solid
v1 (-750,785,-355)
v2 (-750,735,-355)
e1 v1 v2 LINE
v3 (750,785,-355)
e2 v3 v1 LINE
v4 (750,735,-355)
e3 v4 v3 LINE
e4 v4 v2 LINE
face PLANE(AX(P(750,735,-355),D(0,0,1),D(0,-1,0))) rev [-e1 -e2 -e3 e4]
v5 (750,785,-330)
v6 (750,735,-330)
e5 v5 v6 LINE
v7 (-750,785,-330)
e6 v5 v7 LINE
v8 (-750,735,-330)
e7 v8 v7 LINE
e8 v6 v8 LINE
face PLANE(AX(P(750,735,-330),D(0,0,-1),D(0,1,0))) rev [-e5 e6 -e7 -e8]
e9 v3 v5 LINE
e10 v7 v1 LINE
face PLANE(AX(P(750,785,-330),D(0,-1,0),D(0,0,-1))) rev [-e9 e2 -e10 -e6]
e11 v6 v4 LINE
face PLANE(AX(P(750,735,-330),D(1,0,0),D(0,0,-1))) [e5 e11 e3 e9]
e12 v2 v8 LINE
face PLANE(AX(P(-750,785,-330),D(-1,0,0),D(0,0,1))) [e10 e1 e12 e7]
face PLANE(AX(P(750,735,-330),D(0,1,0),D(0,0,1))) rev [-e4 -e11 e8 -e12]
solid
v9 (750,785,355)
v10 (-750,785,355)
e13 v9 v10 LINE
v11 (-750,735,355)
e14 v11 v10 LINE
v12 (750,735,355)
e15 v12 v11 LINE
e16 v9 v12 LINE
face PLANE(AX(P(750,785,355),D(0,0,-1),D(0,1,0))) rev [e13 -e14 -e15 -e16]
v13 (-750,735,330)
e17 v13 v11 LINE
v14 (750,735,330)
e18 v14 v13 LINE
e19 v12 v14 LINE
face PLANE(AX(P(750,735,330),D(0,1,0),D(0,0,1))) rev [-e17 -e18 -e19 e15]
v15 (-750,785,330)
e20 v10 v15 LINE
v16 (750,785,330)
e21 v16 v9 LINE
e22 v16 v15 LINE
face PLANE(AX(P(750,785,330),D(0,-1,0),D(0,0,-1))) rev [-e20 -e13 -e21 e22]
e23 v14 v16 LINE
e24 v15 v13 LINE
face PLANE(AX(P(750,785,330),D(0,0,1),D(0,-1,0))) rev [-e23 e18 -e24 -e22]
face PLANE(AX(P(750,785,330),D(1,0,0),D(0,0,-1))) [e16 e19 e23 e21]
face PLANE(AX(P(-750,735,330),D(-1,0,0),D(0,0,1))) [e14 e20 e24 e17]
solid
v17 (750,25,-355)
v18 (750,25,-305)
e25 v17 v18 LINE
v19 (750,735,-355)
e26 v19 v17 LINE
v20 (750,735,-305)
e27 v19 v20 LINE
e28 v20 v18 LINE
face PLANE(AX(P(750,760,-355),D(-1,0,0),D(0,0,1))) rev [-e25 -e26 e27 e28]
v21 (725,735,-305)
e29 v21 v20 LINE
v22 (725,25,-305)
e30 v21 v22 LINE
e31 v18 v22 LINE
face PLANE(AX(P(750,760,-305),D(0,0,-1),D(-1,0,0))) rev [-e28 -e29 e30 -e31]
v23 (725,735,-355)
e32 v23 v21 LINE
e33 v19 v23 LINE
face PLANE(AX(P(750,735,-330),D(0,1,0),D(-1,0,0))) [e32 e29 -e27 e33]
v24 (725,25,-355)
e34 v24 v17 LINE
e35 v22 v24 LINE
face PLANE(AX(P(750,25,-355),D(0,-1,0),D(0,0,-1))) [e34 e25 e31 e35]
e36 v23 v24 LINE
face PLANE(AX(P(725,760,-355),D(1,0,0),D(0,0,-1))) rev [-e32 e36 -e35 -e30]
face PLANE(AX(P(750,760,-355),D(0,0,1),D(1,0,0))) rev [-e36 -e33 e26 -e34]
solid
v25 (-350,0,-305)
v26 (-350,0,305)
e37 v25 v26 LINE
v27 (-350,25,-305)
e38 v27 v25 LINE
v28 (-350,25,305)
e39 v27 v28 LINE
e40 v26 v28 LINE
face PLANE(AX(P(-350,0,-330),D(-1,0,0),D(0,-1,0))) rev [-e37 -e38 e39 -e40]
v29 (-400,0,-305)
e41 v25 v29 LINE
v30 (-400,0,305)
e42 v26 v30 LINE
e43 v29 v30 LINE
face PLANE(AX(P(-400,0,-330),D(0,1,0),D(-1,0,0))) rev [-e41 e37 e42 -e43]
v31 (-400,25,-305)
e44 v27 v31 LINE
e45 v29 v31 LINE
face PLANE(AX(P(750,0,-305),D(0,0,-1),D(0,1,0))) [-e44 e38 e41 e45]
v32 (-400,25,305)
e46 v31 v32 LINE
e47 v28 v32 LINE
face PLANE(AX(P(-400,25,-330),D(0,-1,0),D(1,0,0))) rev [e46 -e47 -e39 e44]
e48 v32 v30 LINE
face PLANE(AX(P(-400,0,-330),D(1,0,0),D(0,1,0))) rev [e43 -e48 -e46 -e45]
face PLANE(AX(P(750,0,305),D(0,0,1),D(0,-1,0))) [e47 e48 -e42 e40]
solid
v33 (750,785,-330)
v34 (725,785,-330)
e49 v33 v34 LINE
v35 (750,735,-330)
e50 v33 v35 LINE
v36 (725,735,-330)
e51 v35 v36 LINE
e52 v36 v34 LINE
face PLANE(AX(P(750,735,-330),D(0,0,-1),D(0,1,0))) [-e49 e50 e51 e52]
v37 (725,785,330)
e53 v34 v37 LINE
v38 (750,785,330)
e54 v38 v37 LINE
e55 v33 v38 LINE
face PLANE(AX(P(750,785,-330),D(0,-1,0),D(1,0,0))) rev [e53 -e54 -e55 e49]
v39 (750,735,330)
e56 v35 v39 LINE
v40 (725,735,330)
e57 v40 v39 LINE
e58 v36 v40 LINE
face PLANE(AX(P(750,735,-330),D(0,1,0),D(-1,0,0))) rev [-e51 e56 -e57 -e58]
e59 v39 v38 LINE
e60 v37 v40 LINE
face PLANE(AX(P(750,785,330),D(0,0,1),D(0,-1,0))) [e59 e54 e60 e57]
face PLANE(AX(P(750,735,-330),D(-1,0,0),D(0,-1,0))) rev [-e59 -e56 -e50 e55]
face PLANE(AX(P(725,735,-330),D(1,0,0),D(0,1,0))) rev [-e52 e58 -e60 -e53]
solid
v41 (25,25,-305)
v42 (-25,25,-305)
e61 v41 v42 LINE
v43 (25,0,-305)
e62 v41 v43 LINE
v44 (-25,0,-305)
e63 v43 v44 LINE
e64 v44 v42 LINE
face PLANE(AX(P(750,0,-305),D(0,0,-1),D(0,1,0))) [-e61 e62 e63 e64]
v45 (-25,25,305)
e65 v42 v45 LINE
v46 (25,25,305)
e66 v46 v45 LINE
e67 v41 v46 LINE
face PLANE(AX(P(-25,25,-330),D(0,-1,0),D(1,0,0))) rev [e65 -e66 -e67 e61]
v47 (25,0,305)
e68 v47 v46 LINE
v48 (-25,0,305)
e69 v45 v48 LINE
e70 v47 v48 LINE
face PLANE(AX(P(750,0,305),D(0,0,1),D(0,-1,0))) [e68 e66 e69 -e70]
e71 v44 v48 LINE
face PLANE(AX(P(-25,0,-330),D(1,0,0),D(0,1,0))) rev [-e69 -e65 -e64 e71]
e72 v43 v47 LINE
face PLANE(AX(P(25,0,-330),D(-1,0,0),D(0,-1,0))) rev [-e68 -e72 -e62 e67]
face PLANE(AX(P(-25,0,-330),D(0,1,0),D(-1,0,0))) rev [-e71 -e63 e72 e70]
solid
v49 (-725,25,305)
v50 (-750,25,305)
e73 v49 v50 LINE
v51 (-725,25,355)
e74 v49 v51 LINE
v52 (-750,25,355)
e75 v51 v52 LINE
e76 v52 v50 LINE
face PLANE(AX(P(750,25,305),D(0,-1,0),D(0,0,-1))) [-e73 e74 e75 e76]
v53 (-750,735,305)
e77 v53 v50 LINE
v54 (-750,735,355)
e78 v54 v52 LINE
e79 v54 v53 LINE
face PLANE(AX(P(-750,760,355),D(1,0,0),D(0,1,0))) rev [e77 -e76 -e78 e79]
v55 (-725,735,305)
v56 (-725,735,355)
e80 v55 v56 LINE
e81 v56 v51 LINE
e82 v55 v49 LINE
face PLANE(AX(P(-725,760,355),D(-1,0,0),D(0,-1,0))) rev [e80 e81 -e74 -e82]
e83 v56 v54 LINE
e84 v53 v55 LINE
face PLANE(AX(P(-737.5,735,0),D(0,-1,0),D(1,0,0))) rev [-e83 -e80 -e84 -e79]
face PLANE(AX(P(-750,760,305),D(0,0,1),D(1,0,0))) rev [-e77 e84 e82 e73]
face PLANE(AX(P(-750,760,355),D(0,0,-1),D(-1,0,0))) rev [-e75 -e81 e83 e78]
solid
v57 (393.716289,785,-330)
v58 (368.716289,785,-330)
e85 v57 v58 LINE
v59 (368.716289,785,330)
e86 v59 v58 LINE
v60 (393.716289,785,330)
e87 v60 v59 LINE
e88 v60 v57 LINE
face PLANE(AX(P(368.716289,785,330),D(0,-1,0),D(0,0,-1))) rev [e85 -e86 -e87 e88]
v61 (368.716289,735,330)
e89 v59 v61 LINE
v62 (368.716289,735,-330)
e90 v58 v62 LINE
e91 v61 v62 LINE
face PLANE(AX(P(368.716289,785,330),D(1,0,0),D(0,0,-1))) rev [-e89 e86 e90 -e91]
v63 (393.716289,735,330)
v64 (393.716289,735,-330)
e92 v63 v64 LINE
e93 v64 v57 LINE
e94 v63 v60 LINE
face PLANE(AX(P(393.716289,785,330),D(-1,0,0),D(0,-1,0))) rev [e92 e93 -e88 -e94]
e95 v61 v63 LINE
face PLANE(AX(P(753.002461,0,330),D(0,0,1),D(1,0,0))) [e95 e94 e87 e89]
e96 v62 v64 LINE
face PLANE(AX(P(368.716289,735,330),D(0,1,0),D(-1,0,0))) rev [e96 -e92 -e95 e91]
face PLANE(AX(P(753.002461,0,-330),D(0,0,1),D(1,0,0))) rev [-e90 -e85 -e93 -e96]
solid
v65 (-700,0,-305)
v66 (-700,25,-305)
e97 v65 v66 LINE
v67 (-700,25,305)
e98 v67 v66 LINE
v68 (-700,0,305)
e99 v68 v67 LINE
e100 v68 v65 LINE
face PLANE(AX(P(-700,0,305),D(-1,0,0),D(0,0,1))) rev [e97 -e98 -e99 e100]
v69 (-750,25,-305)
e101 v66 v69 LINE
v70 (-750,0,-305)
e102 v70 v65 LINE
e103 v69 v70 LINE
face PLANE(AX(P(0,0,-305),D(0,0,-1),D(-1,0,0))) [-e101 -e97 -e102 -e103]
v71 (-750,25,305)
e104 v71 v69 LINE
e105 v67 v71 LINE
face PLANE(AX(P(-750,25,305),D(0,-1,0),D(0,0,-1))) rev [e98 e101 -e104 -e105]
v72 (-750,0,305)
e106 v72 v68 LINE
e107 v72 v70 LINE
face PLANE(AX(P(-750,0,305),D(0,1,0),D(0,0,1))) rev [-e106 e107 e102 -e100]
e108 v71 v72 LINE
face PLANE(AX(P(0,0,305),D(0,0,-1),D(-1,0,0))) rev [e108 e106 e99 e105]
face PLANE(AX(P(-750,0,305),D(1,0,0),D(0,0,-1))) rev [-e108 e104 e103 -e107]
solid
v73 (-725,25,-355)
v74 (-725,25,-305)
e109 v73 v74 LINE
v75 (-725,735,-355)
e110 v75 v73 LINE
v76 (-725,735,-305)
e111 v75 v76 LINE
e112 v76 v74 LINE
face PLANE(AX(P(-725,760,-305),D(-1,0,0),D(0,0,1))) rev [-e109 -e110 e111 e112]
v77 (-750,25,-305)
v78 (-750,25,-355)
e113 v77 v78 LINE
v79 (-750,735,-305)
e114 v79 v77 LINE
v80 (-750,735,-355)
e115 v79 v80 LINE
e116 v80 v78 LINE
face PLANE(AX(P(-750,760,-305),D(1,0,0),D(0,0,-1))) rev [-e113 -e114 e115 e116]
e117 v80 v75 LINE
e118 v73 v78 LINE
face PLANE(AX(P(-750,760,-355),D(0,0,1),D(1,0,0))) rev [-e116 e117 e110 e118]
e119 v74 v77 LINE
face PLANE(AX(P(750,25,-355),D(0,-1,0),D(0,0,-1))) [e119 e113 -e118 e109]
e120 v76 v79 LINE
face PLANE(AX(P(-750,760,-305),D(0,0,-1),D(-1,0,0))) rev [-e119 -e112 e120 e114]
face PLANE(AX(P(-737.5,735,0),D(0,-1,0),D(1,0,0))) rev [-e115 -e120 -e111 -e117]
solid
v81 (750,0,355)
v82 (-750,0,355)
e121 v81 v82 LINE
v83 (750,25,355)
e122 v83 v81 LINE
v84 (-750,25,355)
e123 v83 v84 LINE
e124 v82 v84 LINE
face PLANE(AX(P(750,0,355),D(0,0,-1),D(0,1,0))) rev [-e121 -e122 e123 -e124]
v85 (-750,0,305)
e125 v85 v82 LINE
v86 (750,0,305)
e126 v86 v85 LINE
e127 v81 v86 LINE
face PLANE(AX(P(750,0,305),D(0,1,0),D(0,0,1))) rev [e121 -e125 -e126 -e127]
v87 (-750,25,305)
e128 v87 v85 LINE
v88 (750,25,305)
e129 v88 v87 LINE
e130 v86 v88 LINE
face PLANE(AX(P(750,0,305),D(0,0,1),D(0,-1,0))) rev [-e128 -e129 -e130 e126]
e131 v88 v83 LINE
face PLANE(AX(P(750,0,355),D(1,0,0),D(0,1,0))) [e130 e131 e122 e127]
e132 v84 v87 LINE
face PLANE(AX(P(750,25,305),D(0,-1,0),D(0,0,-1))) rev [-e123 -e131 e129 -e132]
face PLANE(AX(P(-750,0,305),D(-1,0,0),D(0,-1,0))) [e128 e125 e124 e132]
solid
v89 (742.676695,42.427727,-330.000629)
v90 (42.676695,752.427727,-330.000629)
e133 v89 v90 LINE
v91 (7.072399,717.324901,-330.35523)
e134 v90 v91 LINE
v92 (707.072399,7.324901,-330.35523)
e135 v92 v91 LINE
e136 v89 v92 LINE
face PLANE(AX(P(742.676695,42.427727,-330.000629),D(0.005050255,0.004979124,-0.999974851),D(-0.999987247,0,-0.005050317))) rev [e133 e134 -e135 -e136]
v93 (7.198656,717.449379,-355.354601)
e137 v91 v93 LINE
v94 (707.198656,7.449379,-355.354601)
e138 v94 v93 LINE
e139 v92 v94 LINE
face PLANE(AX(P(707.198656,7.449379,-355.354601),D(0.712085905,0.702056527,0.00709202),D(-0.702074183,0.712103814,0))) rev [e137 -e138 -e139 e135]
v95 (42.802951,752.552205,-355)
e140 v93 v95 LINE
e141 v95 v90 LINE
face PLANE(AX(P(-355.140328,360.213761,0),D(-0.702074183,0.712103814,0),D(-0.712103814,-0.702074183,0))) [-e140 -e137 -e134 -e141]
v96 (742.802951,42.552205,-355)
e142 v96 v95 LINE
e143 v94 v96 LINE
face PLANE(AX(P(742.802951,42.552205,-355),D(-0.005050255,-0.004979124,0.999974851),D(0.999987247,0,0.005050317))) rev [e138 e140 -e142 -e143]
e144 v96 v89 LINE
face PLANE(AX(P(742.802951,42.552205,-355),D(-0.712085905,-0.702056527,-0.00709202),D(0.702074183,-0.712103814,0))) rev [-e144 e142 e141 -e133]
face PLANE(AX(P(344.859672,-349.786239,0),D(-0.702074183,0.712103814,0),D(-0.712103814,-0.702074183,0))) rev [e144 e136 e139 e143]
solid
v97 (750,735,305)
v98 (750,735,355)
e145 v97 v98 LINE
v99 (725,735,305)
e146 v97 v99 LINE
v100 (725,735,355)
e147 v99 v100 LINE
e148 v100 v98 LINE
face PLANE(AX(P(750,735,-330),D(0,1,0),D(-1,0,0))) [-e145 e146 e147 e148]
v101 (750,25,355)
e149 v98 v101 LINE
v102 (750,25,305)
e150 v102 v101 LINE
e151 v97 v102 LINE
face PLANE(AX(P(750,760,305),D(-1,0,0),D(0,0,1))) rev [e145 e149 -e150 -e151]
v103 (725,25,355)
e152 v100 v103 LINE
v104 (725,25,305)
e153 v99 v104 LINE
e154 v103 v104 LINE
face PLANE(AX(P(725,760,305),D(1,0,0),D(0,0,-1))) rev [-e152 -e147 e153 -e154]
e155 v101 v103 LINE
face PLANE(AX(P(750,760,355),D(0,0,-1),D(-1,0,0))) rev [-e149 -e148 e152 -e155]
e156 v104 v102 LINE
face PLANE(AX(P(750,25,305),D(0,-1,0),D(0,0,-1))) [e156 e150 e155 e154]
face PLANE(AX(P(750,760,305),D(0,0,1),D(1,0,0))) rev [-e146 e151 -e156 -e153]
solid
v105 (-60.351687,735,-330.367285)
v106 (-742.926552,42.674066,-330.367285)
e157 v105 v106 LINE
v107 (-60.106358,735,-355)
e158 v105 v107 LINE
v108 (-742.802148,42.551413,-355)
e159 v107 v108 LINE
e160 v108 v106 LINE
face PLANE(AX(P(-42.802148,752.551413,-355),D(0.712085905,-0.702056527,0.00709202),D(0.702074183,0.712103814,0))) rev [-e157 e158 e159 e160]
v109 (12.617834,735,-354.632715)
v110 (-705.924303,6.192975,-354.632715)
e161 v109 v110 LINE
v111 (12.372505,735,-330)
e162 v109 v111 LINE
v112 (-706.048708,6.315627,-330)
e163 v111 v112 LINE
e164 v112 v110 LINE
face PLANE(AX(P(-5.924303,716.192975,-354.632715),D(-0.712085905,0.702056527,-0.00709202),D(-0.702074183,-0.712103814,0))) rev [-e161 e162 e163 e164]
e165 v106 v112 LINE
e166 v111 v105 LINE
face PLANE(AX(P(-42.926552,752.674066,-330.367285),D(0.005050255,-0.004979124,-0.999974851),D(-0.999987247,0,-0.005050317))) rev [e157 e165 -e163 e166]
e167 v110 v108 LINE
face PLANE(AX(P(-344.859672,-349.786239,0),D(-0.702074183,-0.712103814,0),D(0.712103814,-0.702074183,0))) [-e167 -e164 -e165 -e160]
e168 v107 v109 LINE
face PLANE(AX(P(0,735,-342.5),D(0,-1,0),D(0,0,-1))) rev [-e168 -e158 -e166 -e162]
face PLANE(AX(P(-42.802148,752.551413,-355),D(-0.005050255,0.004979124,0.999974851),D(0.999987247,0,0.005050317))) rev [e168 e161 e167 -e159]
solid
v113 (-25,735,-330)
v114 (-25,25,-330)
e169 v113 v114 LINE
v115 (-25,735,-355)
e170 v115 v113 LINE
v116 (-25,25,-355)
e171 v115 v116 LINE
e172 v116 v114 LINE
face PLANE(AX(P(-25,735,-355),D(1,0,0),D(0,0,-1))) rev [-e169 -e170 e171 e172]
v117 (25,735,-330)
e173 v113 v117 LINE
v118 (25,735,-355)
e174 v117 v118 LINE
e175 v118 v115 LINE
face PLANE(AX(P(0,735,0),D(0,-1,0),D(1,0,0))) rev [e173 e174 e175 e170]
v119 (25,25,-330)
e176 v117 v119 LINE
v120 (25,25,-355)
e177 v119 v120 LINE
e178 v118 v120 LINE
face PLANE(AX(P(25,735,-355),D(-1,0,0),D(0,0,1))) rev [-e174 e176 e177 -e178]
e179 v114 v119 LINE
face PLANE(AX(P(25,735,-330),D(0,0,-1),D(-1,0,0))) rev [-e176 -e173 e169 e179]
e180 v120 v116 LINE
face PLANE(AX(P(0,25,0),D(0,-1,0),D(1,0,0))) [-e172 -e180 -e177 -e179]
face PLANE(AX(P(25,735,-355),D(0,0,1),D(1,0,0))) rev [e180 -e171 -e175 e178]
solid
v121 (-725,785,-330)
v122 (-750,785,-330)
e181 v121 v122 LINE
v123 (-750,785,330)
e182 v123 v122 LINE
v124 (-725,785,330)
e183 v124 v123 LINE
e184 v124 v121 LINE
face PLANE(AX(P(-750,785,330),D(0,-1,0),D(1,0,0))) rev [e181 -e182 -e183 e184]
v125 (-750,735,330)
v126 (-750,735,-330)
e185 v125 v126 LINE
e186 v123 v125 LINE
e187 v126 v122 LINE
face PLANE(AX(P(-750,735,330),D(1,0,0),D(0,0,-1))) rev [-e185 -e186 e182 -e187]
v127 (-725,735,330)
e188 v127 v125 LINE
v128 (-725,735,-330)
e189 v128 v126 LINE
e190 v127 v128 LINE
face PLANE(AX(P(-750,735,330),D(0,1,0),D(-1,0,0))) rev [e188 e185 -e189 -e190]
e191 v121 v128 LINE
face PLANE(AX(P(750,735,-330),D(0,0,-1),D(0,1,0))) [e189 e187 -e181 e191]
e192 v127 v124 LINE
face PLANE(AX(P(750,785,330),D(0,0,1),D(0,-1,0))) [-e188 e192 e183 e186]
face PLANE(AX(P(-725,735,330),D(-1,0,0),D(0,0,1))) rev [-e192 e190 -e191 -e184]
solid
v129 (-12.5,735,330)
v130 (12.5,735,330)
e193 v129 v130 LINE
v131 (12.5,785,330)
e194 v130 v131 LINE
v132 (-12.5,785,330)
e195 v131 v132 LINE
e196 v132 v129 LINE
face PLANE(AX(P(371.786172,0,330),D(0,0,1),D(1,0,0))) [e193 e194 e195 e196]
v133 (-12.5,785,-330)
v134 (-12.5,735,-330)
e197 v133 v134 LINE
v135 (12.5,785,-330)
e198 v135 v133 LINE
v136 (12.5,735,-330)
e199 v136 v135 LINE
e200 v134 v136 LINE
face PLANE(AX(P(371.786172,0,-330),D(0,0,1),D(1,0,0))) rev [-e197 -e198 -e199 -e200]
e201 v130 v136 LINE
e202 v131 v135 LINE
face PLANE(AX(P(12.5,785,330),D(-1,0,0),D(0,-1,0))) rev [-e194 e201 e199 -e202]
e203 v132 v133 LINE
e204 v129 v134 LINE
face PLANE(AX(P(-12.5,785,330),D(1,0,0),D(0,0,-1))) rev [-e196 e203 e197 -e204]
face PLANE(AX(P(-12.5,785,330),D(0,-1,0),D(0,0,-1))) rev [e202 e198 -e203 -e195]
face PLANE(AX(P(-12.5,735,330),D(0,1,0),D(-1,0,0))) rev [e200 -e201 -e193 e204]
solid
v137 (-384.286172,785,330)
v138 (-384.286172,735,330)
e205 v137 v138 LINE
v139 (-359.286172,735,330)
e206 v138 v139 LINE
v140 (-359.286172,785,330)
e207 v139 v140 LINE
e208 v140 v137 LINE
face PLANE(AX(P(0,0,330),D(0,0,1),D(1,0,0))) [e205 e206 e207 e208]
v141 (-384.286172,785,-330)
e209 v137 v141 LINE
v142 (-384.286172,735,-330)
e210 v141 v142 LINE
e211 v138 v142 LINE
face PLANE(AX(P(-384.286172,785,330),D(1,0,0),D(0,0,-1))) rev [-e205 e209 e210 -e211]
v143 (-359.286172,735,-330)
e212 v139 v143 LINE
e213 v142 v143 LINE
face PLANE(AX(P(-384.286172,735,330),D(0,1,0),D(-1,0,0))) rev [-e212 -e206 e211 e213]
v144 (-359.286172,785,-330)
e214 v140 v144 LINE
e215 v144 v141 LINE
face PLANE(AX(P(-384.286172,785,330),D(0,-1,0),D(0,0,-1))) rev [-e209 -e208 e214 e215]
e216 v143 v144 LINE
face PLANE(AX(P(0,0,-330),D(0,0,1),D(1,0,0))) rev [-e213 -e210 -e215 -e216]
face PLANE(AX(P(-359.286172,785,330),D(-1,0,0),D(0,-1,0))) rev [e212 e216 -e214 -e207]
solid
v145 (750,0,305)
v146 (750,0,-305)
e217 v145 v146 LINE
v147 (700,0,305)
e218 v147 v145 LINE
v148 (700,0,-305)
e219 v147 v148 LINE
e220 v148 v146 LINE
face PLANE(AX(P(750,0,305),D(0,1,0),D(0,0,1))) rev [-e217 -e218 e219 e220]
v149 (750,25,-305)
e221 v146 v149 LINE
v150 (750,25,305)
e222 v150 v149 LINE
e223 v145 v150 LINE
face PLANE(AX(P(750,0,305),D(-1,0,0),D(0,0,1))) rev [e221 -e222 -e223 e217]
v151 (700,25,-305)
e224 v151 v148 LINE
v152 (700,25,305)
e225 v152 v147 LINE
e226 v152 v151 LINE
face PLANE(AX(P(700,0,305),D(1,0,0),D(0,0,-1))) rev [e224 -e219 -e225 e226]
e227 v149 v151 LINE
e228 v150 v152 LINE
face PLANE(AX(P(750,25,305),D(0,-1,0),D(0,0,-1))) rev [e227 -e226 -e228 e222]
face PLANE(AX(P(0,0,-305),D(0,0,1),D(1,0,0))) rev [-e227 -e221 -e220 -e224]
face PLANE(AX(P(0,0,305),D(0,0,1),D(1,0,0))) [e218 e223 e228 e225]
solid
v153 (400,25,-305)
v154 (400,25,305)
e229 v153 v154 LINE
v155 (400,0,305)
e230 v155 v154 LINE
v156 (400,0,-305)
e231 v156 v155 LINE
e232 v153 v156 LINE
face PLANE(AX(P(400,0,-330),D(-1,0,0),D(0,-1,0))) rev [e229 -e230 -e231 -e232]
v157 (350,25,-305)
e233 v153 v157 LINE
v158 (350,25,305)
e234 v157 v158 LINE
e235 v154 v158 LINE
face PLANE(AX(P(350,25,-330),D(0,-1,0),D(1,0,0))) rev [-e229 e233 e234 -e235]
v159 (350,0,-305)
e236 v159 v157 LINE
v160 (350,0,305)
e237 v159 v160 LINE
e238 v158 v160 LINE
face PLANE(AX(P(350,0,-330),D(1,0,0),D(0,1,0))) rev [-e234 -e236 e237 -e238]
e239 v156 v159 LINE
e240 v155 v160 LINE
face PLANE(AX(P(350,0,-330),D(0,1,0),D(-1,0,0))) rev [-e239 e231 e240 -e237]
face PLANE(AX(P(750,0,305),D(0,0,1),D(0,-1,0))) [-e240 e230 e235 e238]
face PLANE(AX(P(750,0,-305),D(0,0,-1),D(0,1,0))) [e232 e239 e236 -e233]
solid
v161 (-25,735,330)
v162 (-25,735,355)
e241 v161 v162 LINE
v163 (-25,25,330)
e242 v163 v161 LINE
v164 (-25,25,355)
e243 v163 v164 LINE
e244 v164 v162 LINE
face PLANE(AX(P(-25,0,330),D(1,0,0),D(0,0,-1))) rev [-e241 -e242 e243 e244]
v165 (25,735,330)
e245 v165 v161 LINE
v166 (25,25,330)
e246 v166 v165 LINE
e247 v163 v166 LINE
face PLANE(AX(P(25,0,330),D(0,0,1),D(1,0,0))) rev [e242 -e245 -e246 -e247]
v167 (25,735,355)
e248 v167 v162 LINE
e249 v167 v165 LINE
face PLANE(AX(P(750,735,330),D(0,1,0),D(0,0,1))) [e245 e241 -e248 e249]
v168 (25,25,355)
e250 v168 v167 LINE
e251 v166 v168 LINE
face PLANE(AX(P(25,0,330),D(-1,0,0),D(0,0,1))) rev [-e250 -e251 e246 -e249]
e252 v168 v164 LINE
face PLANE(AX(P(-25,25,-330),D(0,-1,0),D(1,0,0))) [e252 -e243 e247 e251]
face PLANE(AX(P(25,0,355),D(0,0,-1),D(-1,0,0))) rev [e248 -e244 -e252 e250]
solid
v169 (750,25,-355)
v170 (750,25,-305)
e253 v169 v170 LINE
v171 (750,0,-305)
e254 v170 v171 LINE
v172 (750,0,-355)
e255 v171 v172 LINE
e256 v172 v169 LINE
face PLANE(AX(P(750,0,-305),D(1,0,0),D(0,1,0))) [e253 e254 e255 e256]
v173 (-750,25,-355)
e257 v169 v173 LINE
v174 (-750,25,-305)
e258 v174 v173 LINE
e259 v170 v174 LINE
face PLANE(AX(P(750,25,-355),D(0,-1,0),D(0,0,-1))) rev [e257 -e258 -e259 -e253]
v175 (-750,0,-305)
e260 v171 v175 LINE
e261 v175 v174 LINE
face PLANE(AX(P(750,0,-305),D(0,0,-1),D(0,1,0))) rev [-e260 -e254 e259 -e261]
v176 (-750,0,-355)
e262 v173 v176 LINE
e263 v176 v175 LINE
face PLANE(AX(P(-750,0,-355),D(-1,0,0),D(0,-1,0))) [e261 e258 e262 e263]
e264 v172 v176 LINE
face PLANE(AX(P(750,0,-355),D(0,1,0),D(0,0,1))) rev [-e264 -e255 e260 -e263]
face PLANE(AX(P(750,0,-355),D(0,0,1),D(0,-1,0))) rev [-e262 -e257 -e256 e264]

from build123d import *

# Parameters (mm, degrees)
SQUARE_RODS_SQUARE_BAR_50_1_OUTLINE_W          = 1500
SQUARE_RODS_SQUARE_BAR_50_1_OUTLINE_H          = 50
SQUARE_RODS_SQUARE_BAR_50_1_DEPTH              = 25
SQUARE_RODS_START                              = 725
SQUARE_RODS_SQUARE_BAR_50_1_2_OUTLINE_W        = 710
SQUARE_RODS_SQUARE_BAR_50_1_2_OUTLINE_H        = 50
SQUARE_RODS_SQUARE_BAR_50_1_2_DEPTH            = 25
SQUARE_RODS_SQUARE_BAR_50_1_3_OUTLINE_W        = 1500
SQUARE_RODS_SQUARE_BAR_50_1_3_OUTLINE_H        = 50
SQUARE_RODS_SQUARE_BAR_50_1_3_DEPTH            = 25
SQUARE_RODS_SQUARE_BAR_50_1_4_OUTLINE_W        = 710
SQUARE_RODS_SQUARE_BAR_50_1_4_OUTLINE_H        = 50
SQUARE_RODS_SQUARE_BAR_50_1_4_DEPTH            = 25
SQUARE_RODS_START_2                            = -305
SQUARE_RODS_SQUARE_BAR_50_1_5_OUTLINE_W        = 50
SQUARE_RODS_SQUARE_BAR_50_1_5_OUTLINE_H        = 25
SQUARE_RODS_SQUARE_BAR_50_1_5_DEPTH            = 610
SQUARE_RODS_SQUARE_BAR_50_1_6_OUTLINE_W        = 50
SQUARE_RODS_SQUARE_BAR_50_1_6_OUTLINE_H        = 25
SQUARE_RODS_SQUARE_BAR_50_1_6_DEPTH            = 610
SQUARE_RODS_START_3                            = -25
SQUARE_RODS_SQUARE_BAR_50_1_7_OUTLINE_W        = 710
SQUARE_RODS_SQUARE_BAR_50_1_7_OUTLINE_H        = 25
SQUARE_RODS_SQUARE_BAR_50_1_7_DEPTH            = 50
SQUARE_RODS_SQUARE_BAR_50_1_8_OUTLINE_W        = 50
SQUARE_RODS_SQUARE_BAR_50_1_8_OUTLINE_H        = 25
SQUARE_RODS_SQUARE_BAR_50_1_8_DEPTH            = 610
SQUARE_RODS_START_4                            = -750
SQUARE_RODS_SQUARE_BAR_50_1_9_OUTLINE_W        = 735
SQUARE_RODS_SQUARE_BAR_50_1_9_OUTLINE_H        = 50
SQUARE_RODS_SQUARE_BAR_50_1_9_DEPTH            = 25
SQUARE_RODS_SQUARE_BAR_50_1_10_OUTLINE_W       = 735
SQUARE_RODS_SQUARE_BAR_50_1_10_OUTLINE_H       = 50
SQUARE_RODS_SQUARE_BAR_50_1_10_DEPTH           = 25
SQUARE_RODS_START_5                            = -355
SQUARE_RODS_SQUARE_BAR_50_1_11_OUTLINE_W       = 1450
SQUARE_RODS_SQUARE_BAR_50_1_11_OUTLINE_H       = 50
SQUARE_RODS_SQUARE_BAR_50_1_11_DEPTH           = 25
SQUARE_RODS_SQUARE_BAR_50_1_12_OUTLINE_W       = 50
SQUARE_RODS_SQUARE_BAR_50_1_12_OUTLINE_H       = 660
SQUARE_RODS_SQUARE_BAR_50_1_12_DEPTH           = 25
SQUARE_RODS_SQUARE_BAR_50_1_13_OUTLINE_W       = 25
SQUARE_RODS_SQUARE_BAR_50_1_13_OUTLINE_H       = 50
SQUARE_RODS_SQUARE_BAR_50_1_13_DEPTH           = 610
SQUARE_RODS_START_6                            = 330
SQUARE_RODS_SQUARE_BAR_50_1_14_OUTLINE_W       = 1450
SQUARE_RODS_SQUARE_BAR_50_1_14_OUTLINE_H       = 50
SQUARE_RODS_SQUARE_BAR_50_1_14_DEPTH           = 25
SKETCH57_W                                     = 50
SKETCH57_H                                     = 25
AL_TUBE_RECTANGULAR_AL_TUBE_2_X_1_RECT_X_DEPTH = 610
SKETCH59_W                                     = 50
SKETCH59_H                                     = 25
AL_TUBE_RECTANGULAR_AL_TUBE_2_X_1_RE_2_DEPTH   = 610
SKETCH61_W                                     = 50
SKETCH61_H                                     = 25
AL_TUBE_RECTANGULAR_AL_TUBE_2_X_1_RE_3_DEPTH   = 710
SKETCH63_W                                     = 25
SKETCH63_H                                     = 50
AL_TUBE_RECTANGULAR_AL_TUBE_2_X_1_RE_4_DEPTH   = 660
SKETCH63_ON_SEGMENT_2_W                        = 25
SKETCH63_ON_SEGMENT_2_H                        = 50
AL_TUBE_RECTANGULAR_AL_TUBE_2_X_1_RE_4_2_DEPTH = 660
SKETCH63_ON_SEGMENT_3_W                        = 25
SKETCH63_ON_SEGMENT_3_H                        = 50
AL_TUBE_RECTANGULAR_AL_TUBE_2_X_1_RE_4_3_DEPTH = 660
SKETCH67_W                                     = 24.633334571
SKETCH67_H                                     = 51.788476831
AL_TUBE_RECTANGULAR_AL_TUBE_2_X_1_RE_5_DEPTH   = 997.045635866
SKETCH69_W                                     = 25
SKETCH69_H                                     = 50
AL_TUBE_RECTANGULAR_AL_TUBE_2_X_1_RE_6_DEPTH   = 997.045635866
BODY_START                                     = 305
BODY_13_RUN_ON_DEPTH                           = 50
TRIM_EXTEND1_EXTEND_2_RUN_ON                   = 25
TRIM_EXTEND2_EXTEND_2_RUN_ON                   = 25
TRIM_EXTEND3_EXTEND_2_RUN_ON                   = 25
BODY_START_2                                   = -305
BODY_13_RUN_ON_2_DEPTH                         = 50
TRIM_EXTEND4_EXTEND_2_RUN_ON                   = 25
TRIM_EXTEND6_START                             = 735
TRIM_EXTEND6_OUTLINE_W                         = 25
TRIM_EXTEND6_OUTLINE_H                         = 50
TRIM_EXTEND6_DEPTH                             = 25
TRIM_EXTEND9_START                             = 735
TRIM_EXTEND9_OUTLINE_W                         = 25
TRIM_EXTEND9_OUTLINE_H                         = 50
TRIM_EXTEND9_DEPTH                             = 25
BODY_START_3                                   = 997.045636043
BODY_21_RUN_ON_DEPTH                           = 26.41051


# Read off the part's stored shape, not the designer's step: Square-rods SQUARE BAR 50(1), Trim/Extend6, Trim/Extend9
with BuildPart() as part:
    # Square-rods SQUARE BAR 50(1) outline → Square-rods SQUARE BAR 50(1) (new body)
    with BuildSketch(Plane(origin=(0, 0, 0), x_dir=(1, 0, 0), z_dir=(0, 1, 0))):
        with Locations((0, -330)):
            Rectangle(SQUARE_RODS_SQUARE_BAR_50_1_OUTLINE_W, SQUARE_RODS_SQUARE_BAR_50_1_OUTLINE_H)
    extrude(amount=SQUARE_RODS_SQUARE_BAR_50_1_DEPTH)


with BuildPart() as body_2:
    # Square-rods SQUARE BAR 50_1 2 outline → Square-rods SQUARE BAR 50_1 2 (new body)
    with BuildSketch(Plane.YZ.offset(SQUARE_RODS_START)):
        with Locations((380, 330)):
            Rectangle(SQUARE_RODS_SQUARE_BAR_50_1_2_OUTLINE_W, SQUARE_RODS_SQUARE_BAR_50_1_2_OUTLINE_H)
    extrude(amount=SQUARE_RODS_SQUARE_BAR_50_1_2_DEPTH)


with BuildPart() as body_3:
    # Square-rods SQUARE BAR 50_1 3 outline → Square-rods SQUARE BAR 50_1 3 (new body)
    with BuildSketch(Plane(origin=(0, 0, 0), x_dir=(1, 0, 0), z_dir=(0, 1, 0))):
        with Locations((0, 330)):
            Rectangle(SQUARE_RODS_SQUARE_BAR_50_1_3_OUTLINE_W, SQUARE_RODS_SQUARE_BAR_50_1_3_OUTLINE_H)
    extrude(amount=SQUARE_RODS_SQUARE_BAR_50_1_3_DEPTH)


with BuildPart() as body_4:
    # Square-rods SQUARE BAR 50_1 4 outline → Square-rods SQUARE BAR 50_1 4 (new body)
    with BuildSketch(Plane.YZ.offset(SQUARE_RODS_START)):
        with Locations((380, -330)):
            Rectangle(SQUARE_RODS_SQUARE_BAR_50_1_4_OUTLINE_W, SQUARE_RODS_SQUARE_BAR_50_1_4_OUTLINE_H)
    extrude(amount=SQUARE_RODS_SQUARE_BAR_50_1_4_DEPTH)


with BuildPart() as body_5:
    # Square-rods SQUARE BAR 50_1 5 outline → Square-rods SQUARE BAR 50_1 5 (new body)
    with BuildSketch(Plane.XY.offset(SQUARE_RODS_START_2)):
        with Locations((-375, 12.5)):
            Rectangle(SQUARE_RODS_SQUARE_BAR_50_1_5_OUTLINE_W, SQUARE_RODS_SQUARE_BAR_50_1_5_OUTLINE_H)
    extrude(amount=SQUARE_RODS_SQUARE_BAR_50_1_5_DEPTH)


with BuildPart() as body_6:
    # Square-rods SQUARE BAR 50_1 6 outline → Square-rods SQUARE BAR 50_1 6 (new body)
    with BuildSketch(Plane.XY.offset(SQUARE_RODS_START_2)):
        with Locations((0, 12.5)):
            Rectangle(SQUARE_RODS_SQUARE_BAR_50_1_6_OUTLINE_W, SQUARE_RODS_SQUARE_BAR_50_1_6_OUTLINE_H)
    extrude(amount=SQUARE_RODS_SQUARE_BAR_50_1_6_DEPTH)


with BuildPart() as body_7:
    # Square-rods SQUARE BAR 50_1 7 outline → Square-rods SQUARE BAR 50_1 7 (new body)
    with BuildSketch(Plane.YZ.offset(SQUARE_RODS_START_3)):
        with Locations((380, 342.5)):
            Rectangle(SQUARE_RODS_SQUARE_BAR_50_1_7_OUTLINE_W, SQUARE_RODS_SQUARE_BAR_50_1_7_OUTLINE_H)
    extrude(amount=SQUARE_RODS_SQUARE_BAR_50_1_7_DEPTH)


with BuildPart() as body_8:
    # Square-rods SQUARE BAR 50_1 8 outline → Square-rods SQUARE BAR 50_1 8 (new body)
    with BuildSketch(Plane.XY.offset(SQUARE_RODS_START_2)):
        with Locations((375, 12.5)):
            Rectangle(SQUARE_RODS_SQUARE_BAR_50_1_8_OUTLINE_W, SQUARE_RODS_SQUARE_BAR_50_1_8_OUTLINE_H)
    extrude(amount=SQUARE_RODS_SQUARE_BAR_50_1_8_DEPTH)


with BuildPart() as body_9:
    # Square-rods SQUARE BAR 50_1 9 outline → Square-rods SQUARE BAR 50_1 9 (new body)
    with BuildSketch(Plane.YZ.offset(SQUARE_RODS_START_4)):
        with Locations((392.5, -330)):
            Rectangle(SQUARE_RODS_SQUARE_BAR_50_1_9_OUTLINE_W, SQUARE_RODS_SQUARE_BAR_50_1_9_OUTLINE_H)
    extrude(amount=SQUARE_RODS_SQUARE_BAR_50_1_9_DEPTH)

    # Trim/Extend9 outline → Trim/Extend9 (cut)
    with BuildSketch(Plane(origin=(0, 0, 0), x_dir=(1, 0, 0), z_dir=(0, 1, 0)).offset(TRIM_EXTEND9_START)):
        with Locations((-737.5, 330)):
            Rectangle(TRIM_EXTEND9_OUTLINE_W, TRIM_EXTEND9_OUTLINE_H)
    extrude(amount=TRIM_EXTEND9_DEPTH, mode=Mode.SUBTRACT)


with BuildPart() as body_10:
    # Square-rods SQUARE BAR 50_1 10 outline → Square-rods SQUARE BAR 50_1 10 (new body)
    with BuildSketch(Plane.YZ.offset(SQUARE_RODS_START_4)):
        with Locations((392.5, 330)):
            Rectangle(SQUARE_RODS_SQUARE_BAR_50_1_10_OUTLINE_W, SQUARE_RODS_SQUARE_BAR_50_1_10_OUTLINE_H)
    extrude(amount=SQUARE_RODS_SQUARE_BAR_50_1_10_DEPTH)

    # Trim/Extend6 outline → Trim/Extend6 (cut)
    with BuildSketch(Plane(origin=(0, 0, 0), x_dir=(1, 0, 0), z_dir=(0, 1, 0)).offset(TRIM_EXTEND6_START)):
        with Locations((-737.5, -330)):
            Rectangle(TRIM_EXTEND6_OUTLINE_W, TRIM_EXTEND6_OUTLINE_H)
    extrude(amount=TRIM_EXTEND6_DEPTH, mode=Mode.SUBTRACT)


with BuildPart() as body_11:
    # Square-rods SQUARE BAR 50_1 11 outline → Square-rods SQUARE BAR 50_1 11 (new body)
    with BuildSketch(Plane.XY.offset(SQUARE_RODS_START_5)):
        with Locations((0, 760)):
            Rectangle(SQUARE_RODS_SQUARE_BAR_50_1_11_OUTLINE_W, SQUARE_RODS_SQUARE_BAR_50_1_11_OUTLINE_H)
    extrude(amount=SQUARE_RODS_SQUARE_BAR_50_1_11_DEPTH)

    # Trim/Extend3 extend 2: the member runs on so that the trim can cut it back to the boundary (SolidWorks' 'allow extension')
    extrude(body_11.faces().sort_by_distance((725, 760, -342.5))[0], amount=TRIM_EXTEND3_EXTEND_2_RUN_ON, dir=(1, 0, 0))

    # Trim/Extend4 extend 2: the member runs on so that the trim can cut it back to the boundary (SolidWorks' 'allow extension')
    extrude(body_11.faces().sort_by_distance((-725, 760, -342.5))[0], amount=TRIM_EXTEND4_EXTEND_2_RUN_ON, dir=(-1, 0, 0))


with BuildPart() as body_12:
    # Square-rods SQUARE BAR 50_1 12 outline → Square-rods SQUARE BAR 50_1 12 (new body)
    with BuildSketch(Plane.YZ.offset(SQUARE_RODS_START)):
        with Locations((760, 0)):
            Rectangle(SQUARE_RODS_SQUARE_BAR_50_1_12_OUTLINE_W, SQUARE_RODS_SQUARE_BAR_50_1_12_OUTLINE_H)
    extrude(amount=SQUARE_RODS_SQUARE_BAR_50_1_12_DEPTH)


with BuildPart() as body_13:
    # Square-rods SQUARE BAR 50_1 13 outline → Square-rods SQUARE BAR 50_1 13 (new body)
    with BuildSketch(Plane.XY.offset(SQUARE_RODS_START_2)):
        with Locations((-737.5, 760)):
            Rectangle(SQUARE_RODS_SQUARE_BAR_50_1_13_OUTLINE_W, SQUARE_RODS_SQUARE_BAR_50_1_13_OUTLINE_H)
    extrude(amount=SQUARE_RODS_SQUARE_BAR_50_1_13_DEPTH)

    # Square-rods SQUARE BAR 50_1 13 outline → body 13 run on (add)
    with BuildSketch(Plane.XY.offset(BODY_START)):
        with Locations((-737.5, 760)):
            Rectangle(SQUARE_RODS_SQUARE_BAR_50_1_13_OUTLINE_W, SQUARE_RODS_SQUARE_BAR_50_1_13_OUTLINE_H)
    extrude(amount=BODY_13_RUN_ON_DEPTH)

    # Trim/Extend1
    split(bisect_by=Plane(origin=(0, 760, 330), x_dir=(0, 1, 0), z_dir=(0, 0, -1)), keep=Keep.TOP)

    # Square-rods SQUARE BAR 50_1 13 outline → body 13 run on 2 (add)
    with BuildSketch(Plane.XY.offset(BODY_START_2)):
        with Locations((-737.5, 760)):
            Rectangle(SQUARE_RODS_SQUARE_BAR_50_1_13_OUTLINE_W, SQUARE_RODS_SQUARE_BAR_50_1_13_OUTLINE_H)
    extrude(amount=-BODY_13_RUN_ON_2_DEPTH)

    # Trim_Extend4 3
    split(bisect_by=Plane(origin=(12.5, 760, -330), x_dir=(0, -1, 0), z_dir=(0, 0, 1)), keep=Keep.TOP)


with BuildPart() as body_14:
    # Square-rods SQUARE BAR 50_1 14 outline → Square-rods SQUARE BAR 50_1 14 (new body)
    with BuildSketch(Plane.XY.offset(SQUARE_RODS_START_6)):
        with Locations((0, 760)):
            Rectangle(SQUARE_RODS_SQUARE_BAR_50_1_14_OUTLINE_W, SQUARE_RODS_SQUARE_BAR_50_1_14_OUTLINE_H)
    extrude(amount=SQUARE_RODS_SQUARE_BAR_50_1_14_DEPTH)

    # Trim/Extend1 extend 2: the member runs on so that the trim can cut it back to the boundary (SolidWorks' 'allow extension')
    extrude(body_14.faces().sort_by_distance((-725, 760, 342.5))[0], amount=TRIM_EXTEND1_EXTEND_2_RUN_ON, dir=(-1, 0, 0))

    # Trim/Extend2 extend 2: the member runs on so that the trim can cut it back to the boundary (SolidWorks' 'allow extension')
    extrude(body_14.faces().sort_by_distance((725, 760, 342.5))[0], amount=TRIM_EXTEND2_EXTEND_2_RUN_ON, dir=(1, 0, 0))


with BuildPart() as body_15:
    # Sketch57 → Al tube rectangular AL TUBE 2 X 1 RECT X (new body)
    with BuildSketch(Plane(origin=(-750, 0, -305), x_dir=(1, 0, 0), z_dir=(0, 0, 1))):
        with Locations((25, 12.5)):
            Rectangle(SKETCH57_W, SKETCH57_H)
    extrude(amount=AL_TUBE_RECTANGULAR_AL_TUBE_2_X_1_RECT_X_DEPTH)


with BuildPart() as body_16:
    # Sketch59 → Al tube rectangular AL TUBE 2 X 1 RE 2 (new body)
    with BuildSketch(Plane(origin=(750, 0, -305), x_dir=(1, 0, 0), z_dir=(0, 0, 1))):
        with Locations((-25, 12.5)):
            Rectangle(SKETCH59_W, SKETCH59_H)
    extrude(amount=AL_TUBE_RECTANGULAR_AL_TUBE_2_X_1_RE_2_DEPTH)


with BuildPart() as body_17:
    # Sketch61 → Al tube rectangular AL TUBE 2 X 1 RE 3 (new body)
    with BuildSketch(Plane(origin=(0, 25, -355), x_dir=(-1, 0, 0), z_dir=(0, 1, 0))):
        with Locations((0, 12.5)):
            Rectangle(SKETCH61_W, SKETCH61_H)
    extrude(amount=AL_TUBE_RECTANGULAR_AL_TUBE_2_X_1_RE_3_DEPTH)


with BuildPart() as body_18:
    # Sketch63 → Al tube rectangular AL TUBE 2 X 1 RE 4 (new body)
    with BuildSketch(Plane(origin=(-371.786171595, 785, -330), x_dir=(1, 0, 0), z_dir=(0, 0, 1))):
        with Locations((0, -25)):
            Rectangle(SKETCH63_W, SKETCH63_H)
    extrude(amount=AL_TUBE_RECTANGULAR_AL_TUBE_2_X_1_RE_4_DEPTH)


with BuildPart() as body_19:
    # Sketch63 on segment 2 (carried to segment 2) → Al tube rectangular AL TUBE 2 X 1 RE 4 2 (new body)
    with BuildSketch(Plane(origin=(0, 785, -330), x_dir=(1, 0, 0), z_dir=(0, 0, 1))):
        with Locations((0, -25)):
            Rectangle(SKETCH63_ON_SEGMENT_2_W, SKETCH63_ON_SEGMENT_2_H)
    extrude(amount=AL_TUBE_RECTANGULAR_AL_TUBE_2_X_1_RE_4_2_DEPTH)


with BuildPart() as body_20:
    # Sketch63 on segment 3 (carried to segment 3) → Al tube rectangular AL TUBE 2 X 1 RE 4 3 (new body)
    with BuildSketch(Plane(origin=(381.216289359, 785, -330), x_dir=(1, 0, 0), z_dir=(0, 0, 1))):
        with Locations((0, -25)):
            Rectangle(SKETCH63_ON_SEGMENT_3_W, SKETCH63_ON_SEGMENT_3_H)
    extrude(amount=AL_TUBE_RECTANGULAR_AL_TUBE_2_X_1_RE_4_3_DEPTH)


with BuildPart() as body_21:
    # Sketch67 → Al tube rectangular AL TUBE 2 X 1 RE 5 (new body)
    with BuildSketch(Plane(origin=(-725, 25, -355), x_dir=(0.005050254648851948, -0.0049791243016836795, -0.9999748513083568), z_dir=(0.7020741827848287, 0.7121038139674686, 0))):
        with Locations((-12.493963332, -0.895495835)):
            Rectangle(SKETCH67_W, SKETCH67_H)
    extrude(amount=AL_TUBE_RECTANGULAR_AL_TUBE_2_X_1_RE_5_DEPTH)

    # Sketch67 → body 21 run on (add)
    with BuildSketch(Plane(origin=(-725, 25, -355), x_dir=(0.005050254648851948, -0.0049791243016836795, -0.9999748513083568), z_dir=(0.7020741827848287, 0.7121038139674686, 0)).offset(BODY_START_3)):
        with Locations((-12.493963332, -0.895495835)):
            Rectangle(SKETCH67_W, SKETCH67_H)
    extrude(amount=BODY_21_RUN_ON_DEPTH)

    # Trim/Extend10
    split(bisect_by=Plane(origin=(0, 735, -342.5), x_dir=(1, 0, 0), z_dir=(0, -1, 0)), keep=Keep.TOP)


with BuildPart() as body_22:
    # Sketch69 → Al tube rectangular AL TUBE 2 X 1 RE 6 (new body)
    with BuildSketch(Plane(origin=(25, 735, -355), x_dir=(-0.005050254648856833, -0.004979124301689175, 0.9999748513083568), z_dir=(0.7020741827848284, -0.7121038139674688, 0))):
        with Locations((12.322695953, 0.000129408)):
            Rectangle(SKETCH69_W, SKETCH69_H)
    extrude(amount=AL_TUBE_RECTANGULAR_AL_TUBE_2_X_1_RE_6_DEPTH)


solid = Compound([part.part, body_2.part, body_3.part, body_4.part, body_5.part, body_6.part, body_7.part, body_8.part, body_9.part, body_10.part, body_11.part, body_12.part, body_13.part, body_14.part, body_15.part, body_16.part, body_17.part, body_18.part, body_19.part, body_20.part, body_21.part, body_22.part])
